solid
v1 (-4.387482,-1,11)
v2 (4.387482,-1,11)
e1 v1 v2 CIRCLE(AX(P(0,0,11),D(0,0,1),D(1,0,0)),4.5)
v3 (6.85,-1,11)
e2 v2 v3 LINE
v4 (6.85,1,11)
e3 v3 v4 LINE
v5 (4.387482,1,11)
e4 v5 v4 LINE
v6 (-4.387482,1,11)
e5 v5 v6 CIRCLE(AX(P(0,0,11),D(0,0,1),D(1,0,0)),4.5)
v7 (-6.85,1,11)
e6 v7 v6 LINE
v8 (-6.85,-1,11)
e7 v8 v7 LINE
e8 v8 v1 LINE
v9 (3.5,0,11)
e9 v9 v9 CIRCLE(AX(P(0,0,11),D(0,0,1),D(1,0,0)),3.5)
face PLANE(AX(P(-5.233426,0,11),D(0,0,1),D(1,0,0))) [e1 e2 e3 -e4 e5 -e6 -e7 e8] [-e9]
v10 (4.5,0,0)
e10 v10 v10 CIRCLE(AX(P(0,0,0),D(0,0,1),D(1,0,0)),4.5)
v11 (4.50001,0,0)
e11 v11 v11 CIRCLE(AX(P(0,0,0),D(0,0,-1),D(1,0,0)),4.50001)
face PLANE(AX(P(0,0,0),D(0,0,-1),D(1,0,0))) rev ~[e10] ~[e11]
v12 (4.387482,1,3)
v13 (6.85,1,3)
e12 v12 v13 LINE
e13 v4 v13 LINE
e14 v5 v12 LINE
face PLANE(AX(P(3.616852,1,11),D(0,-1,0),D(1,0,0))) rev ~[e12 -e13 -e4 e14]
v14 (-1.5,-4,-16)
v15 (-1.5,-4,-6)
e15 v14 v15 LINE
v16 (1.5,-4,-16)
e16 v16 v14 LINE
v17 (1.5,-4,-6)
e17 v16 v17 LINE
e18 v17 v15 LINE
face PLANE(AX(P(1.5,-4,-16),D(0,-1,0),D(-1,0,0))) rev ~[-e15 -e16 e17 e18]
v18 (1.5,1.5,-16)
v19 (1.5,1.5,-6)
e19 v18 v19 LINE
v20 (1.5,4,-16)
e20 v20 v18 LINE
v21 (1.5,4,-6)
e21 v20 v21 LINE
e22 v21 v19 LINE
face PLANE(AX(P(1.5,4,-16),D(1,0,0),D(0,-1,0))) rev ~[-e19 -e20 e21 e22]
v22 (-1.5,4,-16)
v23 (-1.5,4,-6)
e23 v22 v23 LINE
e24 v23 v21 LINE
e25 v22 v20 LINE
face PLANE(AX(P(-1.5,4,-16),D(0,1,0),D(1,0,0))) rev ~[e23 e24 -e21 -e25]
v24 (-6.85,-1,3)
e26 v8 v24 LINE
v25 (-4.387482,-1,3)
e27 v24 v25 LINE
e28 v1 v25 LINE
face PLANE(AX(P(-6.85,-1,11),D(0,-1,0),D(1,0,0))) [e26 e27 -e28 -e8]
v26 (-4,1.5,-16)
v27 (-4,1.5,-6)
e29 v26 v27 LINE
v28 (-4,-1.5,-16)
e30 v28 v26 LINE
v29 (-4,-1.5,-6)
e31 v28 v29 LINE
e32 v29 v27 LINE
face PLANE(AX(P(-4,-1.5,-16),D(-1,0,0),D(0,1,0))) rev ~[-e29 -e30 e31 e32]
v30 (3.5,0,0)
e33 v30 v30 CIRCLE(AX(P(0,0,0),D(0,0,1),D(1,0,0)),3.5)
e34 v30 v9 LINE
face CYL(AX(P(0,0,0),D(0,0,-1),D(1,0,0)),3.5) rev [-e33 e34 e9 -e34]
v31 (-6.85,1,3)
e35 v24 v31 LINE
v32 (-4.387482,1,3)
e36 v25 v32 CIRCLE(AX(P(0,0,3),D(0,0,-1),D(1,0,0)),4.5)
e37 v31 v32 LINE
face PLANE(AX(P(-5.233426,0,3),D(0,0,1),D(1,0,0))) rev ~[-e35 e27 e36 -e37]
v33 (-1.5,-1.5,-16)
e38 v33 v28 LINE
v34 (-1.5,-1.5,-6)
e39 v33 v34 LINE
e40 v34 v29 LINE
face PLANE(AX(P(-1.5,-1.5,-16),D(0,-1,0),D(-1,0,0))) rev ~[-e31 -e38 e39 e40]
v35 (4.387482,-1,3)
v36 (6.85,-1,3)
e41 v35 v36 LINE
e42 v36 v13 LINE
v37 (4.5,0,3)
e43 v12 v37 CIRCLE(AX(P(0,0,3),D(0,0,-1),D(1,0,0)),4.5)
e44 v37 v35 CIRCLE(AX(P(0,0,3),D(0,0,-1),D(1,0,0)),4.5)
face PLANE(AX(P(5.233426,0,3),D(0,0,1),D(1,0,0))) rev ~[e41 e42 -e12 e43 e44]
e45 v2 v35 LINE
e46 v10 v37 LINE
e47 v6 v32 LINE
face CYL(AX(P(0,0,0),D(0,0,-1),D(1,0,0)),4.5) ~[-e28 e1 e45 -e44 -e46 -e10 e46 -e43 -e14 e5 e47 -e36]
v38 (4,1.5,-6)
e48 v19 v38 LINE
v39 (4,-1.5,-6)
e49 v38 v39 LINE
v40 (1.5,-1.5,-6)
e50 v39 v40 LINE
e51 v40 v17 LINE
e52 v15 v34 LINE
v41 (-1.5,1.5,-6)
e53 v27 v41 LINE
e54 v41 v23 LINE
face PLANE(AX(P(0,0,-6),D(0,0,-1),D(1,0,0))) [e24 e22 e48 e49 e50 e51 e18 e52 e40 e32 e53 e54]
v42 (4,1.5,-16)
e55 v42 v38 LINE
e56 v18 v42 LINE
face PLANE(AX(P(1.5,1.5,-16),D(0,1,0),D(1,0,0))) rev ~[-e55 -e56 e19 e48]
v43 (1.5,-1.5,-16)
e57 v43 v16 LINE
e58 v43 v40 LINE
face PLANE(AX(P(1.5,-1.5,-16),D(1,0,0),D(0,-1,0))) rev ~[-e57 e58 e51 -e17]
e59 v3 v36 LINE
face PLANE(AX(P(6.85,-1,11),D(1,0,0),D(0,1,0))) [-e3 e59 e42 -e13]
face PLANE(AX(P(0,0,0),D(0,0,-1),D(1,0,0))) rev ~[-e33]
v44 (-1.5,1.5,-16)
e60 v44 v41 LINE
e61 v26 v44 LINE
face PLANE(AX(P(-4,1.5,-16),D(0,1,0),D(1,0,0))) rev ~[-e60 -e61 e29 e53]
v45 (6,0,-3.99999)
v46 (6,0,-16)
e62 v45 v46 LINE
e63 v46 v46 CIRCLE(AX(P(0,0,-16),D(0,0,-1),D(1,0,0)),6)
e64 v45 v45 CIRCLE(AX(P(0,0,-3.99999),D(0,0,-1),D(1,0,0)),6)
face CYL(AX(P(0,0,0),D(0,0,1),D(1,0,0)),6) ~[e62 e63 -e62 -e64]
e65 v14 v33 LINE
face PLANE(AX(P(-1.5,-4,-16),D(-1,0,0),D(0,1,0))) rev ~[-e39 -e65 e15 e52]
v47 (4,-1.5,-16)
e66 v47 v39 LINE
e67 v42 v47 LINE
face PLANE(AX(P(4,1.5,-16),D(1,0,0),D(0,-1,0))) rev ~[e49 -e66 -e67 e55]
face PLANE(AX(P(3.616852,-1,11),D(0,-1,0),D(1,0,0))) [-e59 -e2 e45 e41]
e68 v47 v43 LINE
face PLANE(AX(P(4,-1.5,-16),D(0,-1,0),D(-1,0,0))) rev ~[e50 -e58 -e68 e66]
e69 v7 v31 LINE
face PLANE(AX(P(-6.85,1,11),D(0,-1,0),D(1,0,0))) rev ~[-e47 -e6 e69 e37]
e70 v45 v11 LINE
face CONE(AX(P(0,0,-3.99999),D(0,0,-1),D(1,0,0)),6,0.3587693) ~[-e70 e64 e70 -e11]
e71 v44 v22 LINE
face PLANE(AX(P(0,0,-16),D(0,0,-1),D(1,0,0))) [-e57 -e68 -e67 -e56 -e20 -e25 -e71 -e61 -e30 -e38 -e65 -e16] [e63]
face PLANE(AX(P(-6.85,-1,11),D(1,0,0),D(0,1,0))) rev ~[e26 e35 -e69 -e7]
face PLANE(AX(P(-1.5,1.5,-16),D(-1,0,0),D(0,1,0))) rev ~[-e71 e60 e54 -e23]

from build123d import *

# Parameters (mm, degrees)
F0_R     = 4.5
F0_R_2   = 3.5
F1_DEPTH = 11
F2_W     = 3.2331479252
F2_H     = 2
F3_DEPTH = 8
F4_R     = 6
F5_DEPTH = 16
F6_SIZE2 = 1.49999
F6_SIZE  = 3.99999
F8_DEPTH = 10


# Not quite as in the source:
# - a fillet or chamfer is up to 0.001 mm smaller than in the source, because OpenCascade refuses the exact size


with BuildPart() as f1:
    # F0 (on Top) → F1 (new body)
    with BuildSketch(Plane.XY):
        Circle(F0_R)
        Circle(F0_R_2, mode=Mode.SUBTRACT)
    extrude(amount=F1_DEPTH)

    # F2 (on face) → F3 (join)
    with BuildSketch(Plane.XY.offset(11)):
        with Locations((-5.2334260374, 0)):
            Rectangle(F2_W, F2_H)
        with Locations((5.2334260374, 0)):
            Rectangle(F2_W, F2_H)
    extrude(amount=-F3_DEPTH)

    # F4 (on face) → F5 (join)
    with BuildSketch(Plane(origin=(0, 0, 0), x_dir=(1, 0, 0), z_dir=(0, 0, -1))):
        Circle(F4_R)
    extrude(amount=F5_DEPTH)

    # F6 (size 4 and 1.5 in the source; OpenCascade refuses exactly that, so slightly less here)
    f6_edges = [f1.edges().sort_by_distance(p)[0] for p in [
        (-6, 0, 0),
    ]]
    f6_side = f1.faces().sort_by_distance((-6, 0, -8))[0]
    chamfer(f6_edges, length=F6_SIZE, length2=F6_SIZE2, reference=f6_side)

    # F7 (on face) → F8 (cut)
    with BuildSketch(Plane(origin=(0, 0, -16), x_dir=(1, 0, 0), z_dir=(0, 0, -1))):
        Polygon((-1.5, 1.5), (-4, 1.5), (-4, -1.5), (-1.5, -1.5), (-1.5, -4), (1.5, -4), (1.5, -1.5), (4, -1.5), (4, 1.5), (1.5, 1.5), (1.5, 4), (-1.5, 4), align=None)
    extrude(amount=-F8_DEPTH, mode=Mode.SUBTRACT)


solid = f1.part
